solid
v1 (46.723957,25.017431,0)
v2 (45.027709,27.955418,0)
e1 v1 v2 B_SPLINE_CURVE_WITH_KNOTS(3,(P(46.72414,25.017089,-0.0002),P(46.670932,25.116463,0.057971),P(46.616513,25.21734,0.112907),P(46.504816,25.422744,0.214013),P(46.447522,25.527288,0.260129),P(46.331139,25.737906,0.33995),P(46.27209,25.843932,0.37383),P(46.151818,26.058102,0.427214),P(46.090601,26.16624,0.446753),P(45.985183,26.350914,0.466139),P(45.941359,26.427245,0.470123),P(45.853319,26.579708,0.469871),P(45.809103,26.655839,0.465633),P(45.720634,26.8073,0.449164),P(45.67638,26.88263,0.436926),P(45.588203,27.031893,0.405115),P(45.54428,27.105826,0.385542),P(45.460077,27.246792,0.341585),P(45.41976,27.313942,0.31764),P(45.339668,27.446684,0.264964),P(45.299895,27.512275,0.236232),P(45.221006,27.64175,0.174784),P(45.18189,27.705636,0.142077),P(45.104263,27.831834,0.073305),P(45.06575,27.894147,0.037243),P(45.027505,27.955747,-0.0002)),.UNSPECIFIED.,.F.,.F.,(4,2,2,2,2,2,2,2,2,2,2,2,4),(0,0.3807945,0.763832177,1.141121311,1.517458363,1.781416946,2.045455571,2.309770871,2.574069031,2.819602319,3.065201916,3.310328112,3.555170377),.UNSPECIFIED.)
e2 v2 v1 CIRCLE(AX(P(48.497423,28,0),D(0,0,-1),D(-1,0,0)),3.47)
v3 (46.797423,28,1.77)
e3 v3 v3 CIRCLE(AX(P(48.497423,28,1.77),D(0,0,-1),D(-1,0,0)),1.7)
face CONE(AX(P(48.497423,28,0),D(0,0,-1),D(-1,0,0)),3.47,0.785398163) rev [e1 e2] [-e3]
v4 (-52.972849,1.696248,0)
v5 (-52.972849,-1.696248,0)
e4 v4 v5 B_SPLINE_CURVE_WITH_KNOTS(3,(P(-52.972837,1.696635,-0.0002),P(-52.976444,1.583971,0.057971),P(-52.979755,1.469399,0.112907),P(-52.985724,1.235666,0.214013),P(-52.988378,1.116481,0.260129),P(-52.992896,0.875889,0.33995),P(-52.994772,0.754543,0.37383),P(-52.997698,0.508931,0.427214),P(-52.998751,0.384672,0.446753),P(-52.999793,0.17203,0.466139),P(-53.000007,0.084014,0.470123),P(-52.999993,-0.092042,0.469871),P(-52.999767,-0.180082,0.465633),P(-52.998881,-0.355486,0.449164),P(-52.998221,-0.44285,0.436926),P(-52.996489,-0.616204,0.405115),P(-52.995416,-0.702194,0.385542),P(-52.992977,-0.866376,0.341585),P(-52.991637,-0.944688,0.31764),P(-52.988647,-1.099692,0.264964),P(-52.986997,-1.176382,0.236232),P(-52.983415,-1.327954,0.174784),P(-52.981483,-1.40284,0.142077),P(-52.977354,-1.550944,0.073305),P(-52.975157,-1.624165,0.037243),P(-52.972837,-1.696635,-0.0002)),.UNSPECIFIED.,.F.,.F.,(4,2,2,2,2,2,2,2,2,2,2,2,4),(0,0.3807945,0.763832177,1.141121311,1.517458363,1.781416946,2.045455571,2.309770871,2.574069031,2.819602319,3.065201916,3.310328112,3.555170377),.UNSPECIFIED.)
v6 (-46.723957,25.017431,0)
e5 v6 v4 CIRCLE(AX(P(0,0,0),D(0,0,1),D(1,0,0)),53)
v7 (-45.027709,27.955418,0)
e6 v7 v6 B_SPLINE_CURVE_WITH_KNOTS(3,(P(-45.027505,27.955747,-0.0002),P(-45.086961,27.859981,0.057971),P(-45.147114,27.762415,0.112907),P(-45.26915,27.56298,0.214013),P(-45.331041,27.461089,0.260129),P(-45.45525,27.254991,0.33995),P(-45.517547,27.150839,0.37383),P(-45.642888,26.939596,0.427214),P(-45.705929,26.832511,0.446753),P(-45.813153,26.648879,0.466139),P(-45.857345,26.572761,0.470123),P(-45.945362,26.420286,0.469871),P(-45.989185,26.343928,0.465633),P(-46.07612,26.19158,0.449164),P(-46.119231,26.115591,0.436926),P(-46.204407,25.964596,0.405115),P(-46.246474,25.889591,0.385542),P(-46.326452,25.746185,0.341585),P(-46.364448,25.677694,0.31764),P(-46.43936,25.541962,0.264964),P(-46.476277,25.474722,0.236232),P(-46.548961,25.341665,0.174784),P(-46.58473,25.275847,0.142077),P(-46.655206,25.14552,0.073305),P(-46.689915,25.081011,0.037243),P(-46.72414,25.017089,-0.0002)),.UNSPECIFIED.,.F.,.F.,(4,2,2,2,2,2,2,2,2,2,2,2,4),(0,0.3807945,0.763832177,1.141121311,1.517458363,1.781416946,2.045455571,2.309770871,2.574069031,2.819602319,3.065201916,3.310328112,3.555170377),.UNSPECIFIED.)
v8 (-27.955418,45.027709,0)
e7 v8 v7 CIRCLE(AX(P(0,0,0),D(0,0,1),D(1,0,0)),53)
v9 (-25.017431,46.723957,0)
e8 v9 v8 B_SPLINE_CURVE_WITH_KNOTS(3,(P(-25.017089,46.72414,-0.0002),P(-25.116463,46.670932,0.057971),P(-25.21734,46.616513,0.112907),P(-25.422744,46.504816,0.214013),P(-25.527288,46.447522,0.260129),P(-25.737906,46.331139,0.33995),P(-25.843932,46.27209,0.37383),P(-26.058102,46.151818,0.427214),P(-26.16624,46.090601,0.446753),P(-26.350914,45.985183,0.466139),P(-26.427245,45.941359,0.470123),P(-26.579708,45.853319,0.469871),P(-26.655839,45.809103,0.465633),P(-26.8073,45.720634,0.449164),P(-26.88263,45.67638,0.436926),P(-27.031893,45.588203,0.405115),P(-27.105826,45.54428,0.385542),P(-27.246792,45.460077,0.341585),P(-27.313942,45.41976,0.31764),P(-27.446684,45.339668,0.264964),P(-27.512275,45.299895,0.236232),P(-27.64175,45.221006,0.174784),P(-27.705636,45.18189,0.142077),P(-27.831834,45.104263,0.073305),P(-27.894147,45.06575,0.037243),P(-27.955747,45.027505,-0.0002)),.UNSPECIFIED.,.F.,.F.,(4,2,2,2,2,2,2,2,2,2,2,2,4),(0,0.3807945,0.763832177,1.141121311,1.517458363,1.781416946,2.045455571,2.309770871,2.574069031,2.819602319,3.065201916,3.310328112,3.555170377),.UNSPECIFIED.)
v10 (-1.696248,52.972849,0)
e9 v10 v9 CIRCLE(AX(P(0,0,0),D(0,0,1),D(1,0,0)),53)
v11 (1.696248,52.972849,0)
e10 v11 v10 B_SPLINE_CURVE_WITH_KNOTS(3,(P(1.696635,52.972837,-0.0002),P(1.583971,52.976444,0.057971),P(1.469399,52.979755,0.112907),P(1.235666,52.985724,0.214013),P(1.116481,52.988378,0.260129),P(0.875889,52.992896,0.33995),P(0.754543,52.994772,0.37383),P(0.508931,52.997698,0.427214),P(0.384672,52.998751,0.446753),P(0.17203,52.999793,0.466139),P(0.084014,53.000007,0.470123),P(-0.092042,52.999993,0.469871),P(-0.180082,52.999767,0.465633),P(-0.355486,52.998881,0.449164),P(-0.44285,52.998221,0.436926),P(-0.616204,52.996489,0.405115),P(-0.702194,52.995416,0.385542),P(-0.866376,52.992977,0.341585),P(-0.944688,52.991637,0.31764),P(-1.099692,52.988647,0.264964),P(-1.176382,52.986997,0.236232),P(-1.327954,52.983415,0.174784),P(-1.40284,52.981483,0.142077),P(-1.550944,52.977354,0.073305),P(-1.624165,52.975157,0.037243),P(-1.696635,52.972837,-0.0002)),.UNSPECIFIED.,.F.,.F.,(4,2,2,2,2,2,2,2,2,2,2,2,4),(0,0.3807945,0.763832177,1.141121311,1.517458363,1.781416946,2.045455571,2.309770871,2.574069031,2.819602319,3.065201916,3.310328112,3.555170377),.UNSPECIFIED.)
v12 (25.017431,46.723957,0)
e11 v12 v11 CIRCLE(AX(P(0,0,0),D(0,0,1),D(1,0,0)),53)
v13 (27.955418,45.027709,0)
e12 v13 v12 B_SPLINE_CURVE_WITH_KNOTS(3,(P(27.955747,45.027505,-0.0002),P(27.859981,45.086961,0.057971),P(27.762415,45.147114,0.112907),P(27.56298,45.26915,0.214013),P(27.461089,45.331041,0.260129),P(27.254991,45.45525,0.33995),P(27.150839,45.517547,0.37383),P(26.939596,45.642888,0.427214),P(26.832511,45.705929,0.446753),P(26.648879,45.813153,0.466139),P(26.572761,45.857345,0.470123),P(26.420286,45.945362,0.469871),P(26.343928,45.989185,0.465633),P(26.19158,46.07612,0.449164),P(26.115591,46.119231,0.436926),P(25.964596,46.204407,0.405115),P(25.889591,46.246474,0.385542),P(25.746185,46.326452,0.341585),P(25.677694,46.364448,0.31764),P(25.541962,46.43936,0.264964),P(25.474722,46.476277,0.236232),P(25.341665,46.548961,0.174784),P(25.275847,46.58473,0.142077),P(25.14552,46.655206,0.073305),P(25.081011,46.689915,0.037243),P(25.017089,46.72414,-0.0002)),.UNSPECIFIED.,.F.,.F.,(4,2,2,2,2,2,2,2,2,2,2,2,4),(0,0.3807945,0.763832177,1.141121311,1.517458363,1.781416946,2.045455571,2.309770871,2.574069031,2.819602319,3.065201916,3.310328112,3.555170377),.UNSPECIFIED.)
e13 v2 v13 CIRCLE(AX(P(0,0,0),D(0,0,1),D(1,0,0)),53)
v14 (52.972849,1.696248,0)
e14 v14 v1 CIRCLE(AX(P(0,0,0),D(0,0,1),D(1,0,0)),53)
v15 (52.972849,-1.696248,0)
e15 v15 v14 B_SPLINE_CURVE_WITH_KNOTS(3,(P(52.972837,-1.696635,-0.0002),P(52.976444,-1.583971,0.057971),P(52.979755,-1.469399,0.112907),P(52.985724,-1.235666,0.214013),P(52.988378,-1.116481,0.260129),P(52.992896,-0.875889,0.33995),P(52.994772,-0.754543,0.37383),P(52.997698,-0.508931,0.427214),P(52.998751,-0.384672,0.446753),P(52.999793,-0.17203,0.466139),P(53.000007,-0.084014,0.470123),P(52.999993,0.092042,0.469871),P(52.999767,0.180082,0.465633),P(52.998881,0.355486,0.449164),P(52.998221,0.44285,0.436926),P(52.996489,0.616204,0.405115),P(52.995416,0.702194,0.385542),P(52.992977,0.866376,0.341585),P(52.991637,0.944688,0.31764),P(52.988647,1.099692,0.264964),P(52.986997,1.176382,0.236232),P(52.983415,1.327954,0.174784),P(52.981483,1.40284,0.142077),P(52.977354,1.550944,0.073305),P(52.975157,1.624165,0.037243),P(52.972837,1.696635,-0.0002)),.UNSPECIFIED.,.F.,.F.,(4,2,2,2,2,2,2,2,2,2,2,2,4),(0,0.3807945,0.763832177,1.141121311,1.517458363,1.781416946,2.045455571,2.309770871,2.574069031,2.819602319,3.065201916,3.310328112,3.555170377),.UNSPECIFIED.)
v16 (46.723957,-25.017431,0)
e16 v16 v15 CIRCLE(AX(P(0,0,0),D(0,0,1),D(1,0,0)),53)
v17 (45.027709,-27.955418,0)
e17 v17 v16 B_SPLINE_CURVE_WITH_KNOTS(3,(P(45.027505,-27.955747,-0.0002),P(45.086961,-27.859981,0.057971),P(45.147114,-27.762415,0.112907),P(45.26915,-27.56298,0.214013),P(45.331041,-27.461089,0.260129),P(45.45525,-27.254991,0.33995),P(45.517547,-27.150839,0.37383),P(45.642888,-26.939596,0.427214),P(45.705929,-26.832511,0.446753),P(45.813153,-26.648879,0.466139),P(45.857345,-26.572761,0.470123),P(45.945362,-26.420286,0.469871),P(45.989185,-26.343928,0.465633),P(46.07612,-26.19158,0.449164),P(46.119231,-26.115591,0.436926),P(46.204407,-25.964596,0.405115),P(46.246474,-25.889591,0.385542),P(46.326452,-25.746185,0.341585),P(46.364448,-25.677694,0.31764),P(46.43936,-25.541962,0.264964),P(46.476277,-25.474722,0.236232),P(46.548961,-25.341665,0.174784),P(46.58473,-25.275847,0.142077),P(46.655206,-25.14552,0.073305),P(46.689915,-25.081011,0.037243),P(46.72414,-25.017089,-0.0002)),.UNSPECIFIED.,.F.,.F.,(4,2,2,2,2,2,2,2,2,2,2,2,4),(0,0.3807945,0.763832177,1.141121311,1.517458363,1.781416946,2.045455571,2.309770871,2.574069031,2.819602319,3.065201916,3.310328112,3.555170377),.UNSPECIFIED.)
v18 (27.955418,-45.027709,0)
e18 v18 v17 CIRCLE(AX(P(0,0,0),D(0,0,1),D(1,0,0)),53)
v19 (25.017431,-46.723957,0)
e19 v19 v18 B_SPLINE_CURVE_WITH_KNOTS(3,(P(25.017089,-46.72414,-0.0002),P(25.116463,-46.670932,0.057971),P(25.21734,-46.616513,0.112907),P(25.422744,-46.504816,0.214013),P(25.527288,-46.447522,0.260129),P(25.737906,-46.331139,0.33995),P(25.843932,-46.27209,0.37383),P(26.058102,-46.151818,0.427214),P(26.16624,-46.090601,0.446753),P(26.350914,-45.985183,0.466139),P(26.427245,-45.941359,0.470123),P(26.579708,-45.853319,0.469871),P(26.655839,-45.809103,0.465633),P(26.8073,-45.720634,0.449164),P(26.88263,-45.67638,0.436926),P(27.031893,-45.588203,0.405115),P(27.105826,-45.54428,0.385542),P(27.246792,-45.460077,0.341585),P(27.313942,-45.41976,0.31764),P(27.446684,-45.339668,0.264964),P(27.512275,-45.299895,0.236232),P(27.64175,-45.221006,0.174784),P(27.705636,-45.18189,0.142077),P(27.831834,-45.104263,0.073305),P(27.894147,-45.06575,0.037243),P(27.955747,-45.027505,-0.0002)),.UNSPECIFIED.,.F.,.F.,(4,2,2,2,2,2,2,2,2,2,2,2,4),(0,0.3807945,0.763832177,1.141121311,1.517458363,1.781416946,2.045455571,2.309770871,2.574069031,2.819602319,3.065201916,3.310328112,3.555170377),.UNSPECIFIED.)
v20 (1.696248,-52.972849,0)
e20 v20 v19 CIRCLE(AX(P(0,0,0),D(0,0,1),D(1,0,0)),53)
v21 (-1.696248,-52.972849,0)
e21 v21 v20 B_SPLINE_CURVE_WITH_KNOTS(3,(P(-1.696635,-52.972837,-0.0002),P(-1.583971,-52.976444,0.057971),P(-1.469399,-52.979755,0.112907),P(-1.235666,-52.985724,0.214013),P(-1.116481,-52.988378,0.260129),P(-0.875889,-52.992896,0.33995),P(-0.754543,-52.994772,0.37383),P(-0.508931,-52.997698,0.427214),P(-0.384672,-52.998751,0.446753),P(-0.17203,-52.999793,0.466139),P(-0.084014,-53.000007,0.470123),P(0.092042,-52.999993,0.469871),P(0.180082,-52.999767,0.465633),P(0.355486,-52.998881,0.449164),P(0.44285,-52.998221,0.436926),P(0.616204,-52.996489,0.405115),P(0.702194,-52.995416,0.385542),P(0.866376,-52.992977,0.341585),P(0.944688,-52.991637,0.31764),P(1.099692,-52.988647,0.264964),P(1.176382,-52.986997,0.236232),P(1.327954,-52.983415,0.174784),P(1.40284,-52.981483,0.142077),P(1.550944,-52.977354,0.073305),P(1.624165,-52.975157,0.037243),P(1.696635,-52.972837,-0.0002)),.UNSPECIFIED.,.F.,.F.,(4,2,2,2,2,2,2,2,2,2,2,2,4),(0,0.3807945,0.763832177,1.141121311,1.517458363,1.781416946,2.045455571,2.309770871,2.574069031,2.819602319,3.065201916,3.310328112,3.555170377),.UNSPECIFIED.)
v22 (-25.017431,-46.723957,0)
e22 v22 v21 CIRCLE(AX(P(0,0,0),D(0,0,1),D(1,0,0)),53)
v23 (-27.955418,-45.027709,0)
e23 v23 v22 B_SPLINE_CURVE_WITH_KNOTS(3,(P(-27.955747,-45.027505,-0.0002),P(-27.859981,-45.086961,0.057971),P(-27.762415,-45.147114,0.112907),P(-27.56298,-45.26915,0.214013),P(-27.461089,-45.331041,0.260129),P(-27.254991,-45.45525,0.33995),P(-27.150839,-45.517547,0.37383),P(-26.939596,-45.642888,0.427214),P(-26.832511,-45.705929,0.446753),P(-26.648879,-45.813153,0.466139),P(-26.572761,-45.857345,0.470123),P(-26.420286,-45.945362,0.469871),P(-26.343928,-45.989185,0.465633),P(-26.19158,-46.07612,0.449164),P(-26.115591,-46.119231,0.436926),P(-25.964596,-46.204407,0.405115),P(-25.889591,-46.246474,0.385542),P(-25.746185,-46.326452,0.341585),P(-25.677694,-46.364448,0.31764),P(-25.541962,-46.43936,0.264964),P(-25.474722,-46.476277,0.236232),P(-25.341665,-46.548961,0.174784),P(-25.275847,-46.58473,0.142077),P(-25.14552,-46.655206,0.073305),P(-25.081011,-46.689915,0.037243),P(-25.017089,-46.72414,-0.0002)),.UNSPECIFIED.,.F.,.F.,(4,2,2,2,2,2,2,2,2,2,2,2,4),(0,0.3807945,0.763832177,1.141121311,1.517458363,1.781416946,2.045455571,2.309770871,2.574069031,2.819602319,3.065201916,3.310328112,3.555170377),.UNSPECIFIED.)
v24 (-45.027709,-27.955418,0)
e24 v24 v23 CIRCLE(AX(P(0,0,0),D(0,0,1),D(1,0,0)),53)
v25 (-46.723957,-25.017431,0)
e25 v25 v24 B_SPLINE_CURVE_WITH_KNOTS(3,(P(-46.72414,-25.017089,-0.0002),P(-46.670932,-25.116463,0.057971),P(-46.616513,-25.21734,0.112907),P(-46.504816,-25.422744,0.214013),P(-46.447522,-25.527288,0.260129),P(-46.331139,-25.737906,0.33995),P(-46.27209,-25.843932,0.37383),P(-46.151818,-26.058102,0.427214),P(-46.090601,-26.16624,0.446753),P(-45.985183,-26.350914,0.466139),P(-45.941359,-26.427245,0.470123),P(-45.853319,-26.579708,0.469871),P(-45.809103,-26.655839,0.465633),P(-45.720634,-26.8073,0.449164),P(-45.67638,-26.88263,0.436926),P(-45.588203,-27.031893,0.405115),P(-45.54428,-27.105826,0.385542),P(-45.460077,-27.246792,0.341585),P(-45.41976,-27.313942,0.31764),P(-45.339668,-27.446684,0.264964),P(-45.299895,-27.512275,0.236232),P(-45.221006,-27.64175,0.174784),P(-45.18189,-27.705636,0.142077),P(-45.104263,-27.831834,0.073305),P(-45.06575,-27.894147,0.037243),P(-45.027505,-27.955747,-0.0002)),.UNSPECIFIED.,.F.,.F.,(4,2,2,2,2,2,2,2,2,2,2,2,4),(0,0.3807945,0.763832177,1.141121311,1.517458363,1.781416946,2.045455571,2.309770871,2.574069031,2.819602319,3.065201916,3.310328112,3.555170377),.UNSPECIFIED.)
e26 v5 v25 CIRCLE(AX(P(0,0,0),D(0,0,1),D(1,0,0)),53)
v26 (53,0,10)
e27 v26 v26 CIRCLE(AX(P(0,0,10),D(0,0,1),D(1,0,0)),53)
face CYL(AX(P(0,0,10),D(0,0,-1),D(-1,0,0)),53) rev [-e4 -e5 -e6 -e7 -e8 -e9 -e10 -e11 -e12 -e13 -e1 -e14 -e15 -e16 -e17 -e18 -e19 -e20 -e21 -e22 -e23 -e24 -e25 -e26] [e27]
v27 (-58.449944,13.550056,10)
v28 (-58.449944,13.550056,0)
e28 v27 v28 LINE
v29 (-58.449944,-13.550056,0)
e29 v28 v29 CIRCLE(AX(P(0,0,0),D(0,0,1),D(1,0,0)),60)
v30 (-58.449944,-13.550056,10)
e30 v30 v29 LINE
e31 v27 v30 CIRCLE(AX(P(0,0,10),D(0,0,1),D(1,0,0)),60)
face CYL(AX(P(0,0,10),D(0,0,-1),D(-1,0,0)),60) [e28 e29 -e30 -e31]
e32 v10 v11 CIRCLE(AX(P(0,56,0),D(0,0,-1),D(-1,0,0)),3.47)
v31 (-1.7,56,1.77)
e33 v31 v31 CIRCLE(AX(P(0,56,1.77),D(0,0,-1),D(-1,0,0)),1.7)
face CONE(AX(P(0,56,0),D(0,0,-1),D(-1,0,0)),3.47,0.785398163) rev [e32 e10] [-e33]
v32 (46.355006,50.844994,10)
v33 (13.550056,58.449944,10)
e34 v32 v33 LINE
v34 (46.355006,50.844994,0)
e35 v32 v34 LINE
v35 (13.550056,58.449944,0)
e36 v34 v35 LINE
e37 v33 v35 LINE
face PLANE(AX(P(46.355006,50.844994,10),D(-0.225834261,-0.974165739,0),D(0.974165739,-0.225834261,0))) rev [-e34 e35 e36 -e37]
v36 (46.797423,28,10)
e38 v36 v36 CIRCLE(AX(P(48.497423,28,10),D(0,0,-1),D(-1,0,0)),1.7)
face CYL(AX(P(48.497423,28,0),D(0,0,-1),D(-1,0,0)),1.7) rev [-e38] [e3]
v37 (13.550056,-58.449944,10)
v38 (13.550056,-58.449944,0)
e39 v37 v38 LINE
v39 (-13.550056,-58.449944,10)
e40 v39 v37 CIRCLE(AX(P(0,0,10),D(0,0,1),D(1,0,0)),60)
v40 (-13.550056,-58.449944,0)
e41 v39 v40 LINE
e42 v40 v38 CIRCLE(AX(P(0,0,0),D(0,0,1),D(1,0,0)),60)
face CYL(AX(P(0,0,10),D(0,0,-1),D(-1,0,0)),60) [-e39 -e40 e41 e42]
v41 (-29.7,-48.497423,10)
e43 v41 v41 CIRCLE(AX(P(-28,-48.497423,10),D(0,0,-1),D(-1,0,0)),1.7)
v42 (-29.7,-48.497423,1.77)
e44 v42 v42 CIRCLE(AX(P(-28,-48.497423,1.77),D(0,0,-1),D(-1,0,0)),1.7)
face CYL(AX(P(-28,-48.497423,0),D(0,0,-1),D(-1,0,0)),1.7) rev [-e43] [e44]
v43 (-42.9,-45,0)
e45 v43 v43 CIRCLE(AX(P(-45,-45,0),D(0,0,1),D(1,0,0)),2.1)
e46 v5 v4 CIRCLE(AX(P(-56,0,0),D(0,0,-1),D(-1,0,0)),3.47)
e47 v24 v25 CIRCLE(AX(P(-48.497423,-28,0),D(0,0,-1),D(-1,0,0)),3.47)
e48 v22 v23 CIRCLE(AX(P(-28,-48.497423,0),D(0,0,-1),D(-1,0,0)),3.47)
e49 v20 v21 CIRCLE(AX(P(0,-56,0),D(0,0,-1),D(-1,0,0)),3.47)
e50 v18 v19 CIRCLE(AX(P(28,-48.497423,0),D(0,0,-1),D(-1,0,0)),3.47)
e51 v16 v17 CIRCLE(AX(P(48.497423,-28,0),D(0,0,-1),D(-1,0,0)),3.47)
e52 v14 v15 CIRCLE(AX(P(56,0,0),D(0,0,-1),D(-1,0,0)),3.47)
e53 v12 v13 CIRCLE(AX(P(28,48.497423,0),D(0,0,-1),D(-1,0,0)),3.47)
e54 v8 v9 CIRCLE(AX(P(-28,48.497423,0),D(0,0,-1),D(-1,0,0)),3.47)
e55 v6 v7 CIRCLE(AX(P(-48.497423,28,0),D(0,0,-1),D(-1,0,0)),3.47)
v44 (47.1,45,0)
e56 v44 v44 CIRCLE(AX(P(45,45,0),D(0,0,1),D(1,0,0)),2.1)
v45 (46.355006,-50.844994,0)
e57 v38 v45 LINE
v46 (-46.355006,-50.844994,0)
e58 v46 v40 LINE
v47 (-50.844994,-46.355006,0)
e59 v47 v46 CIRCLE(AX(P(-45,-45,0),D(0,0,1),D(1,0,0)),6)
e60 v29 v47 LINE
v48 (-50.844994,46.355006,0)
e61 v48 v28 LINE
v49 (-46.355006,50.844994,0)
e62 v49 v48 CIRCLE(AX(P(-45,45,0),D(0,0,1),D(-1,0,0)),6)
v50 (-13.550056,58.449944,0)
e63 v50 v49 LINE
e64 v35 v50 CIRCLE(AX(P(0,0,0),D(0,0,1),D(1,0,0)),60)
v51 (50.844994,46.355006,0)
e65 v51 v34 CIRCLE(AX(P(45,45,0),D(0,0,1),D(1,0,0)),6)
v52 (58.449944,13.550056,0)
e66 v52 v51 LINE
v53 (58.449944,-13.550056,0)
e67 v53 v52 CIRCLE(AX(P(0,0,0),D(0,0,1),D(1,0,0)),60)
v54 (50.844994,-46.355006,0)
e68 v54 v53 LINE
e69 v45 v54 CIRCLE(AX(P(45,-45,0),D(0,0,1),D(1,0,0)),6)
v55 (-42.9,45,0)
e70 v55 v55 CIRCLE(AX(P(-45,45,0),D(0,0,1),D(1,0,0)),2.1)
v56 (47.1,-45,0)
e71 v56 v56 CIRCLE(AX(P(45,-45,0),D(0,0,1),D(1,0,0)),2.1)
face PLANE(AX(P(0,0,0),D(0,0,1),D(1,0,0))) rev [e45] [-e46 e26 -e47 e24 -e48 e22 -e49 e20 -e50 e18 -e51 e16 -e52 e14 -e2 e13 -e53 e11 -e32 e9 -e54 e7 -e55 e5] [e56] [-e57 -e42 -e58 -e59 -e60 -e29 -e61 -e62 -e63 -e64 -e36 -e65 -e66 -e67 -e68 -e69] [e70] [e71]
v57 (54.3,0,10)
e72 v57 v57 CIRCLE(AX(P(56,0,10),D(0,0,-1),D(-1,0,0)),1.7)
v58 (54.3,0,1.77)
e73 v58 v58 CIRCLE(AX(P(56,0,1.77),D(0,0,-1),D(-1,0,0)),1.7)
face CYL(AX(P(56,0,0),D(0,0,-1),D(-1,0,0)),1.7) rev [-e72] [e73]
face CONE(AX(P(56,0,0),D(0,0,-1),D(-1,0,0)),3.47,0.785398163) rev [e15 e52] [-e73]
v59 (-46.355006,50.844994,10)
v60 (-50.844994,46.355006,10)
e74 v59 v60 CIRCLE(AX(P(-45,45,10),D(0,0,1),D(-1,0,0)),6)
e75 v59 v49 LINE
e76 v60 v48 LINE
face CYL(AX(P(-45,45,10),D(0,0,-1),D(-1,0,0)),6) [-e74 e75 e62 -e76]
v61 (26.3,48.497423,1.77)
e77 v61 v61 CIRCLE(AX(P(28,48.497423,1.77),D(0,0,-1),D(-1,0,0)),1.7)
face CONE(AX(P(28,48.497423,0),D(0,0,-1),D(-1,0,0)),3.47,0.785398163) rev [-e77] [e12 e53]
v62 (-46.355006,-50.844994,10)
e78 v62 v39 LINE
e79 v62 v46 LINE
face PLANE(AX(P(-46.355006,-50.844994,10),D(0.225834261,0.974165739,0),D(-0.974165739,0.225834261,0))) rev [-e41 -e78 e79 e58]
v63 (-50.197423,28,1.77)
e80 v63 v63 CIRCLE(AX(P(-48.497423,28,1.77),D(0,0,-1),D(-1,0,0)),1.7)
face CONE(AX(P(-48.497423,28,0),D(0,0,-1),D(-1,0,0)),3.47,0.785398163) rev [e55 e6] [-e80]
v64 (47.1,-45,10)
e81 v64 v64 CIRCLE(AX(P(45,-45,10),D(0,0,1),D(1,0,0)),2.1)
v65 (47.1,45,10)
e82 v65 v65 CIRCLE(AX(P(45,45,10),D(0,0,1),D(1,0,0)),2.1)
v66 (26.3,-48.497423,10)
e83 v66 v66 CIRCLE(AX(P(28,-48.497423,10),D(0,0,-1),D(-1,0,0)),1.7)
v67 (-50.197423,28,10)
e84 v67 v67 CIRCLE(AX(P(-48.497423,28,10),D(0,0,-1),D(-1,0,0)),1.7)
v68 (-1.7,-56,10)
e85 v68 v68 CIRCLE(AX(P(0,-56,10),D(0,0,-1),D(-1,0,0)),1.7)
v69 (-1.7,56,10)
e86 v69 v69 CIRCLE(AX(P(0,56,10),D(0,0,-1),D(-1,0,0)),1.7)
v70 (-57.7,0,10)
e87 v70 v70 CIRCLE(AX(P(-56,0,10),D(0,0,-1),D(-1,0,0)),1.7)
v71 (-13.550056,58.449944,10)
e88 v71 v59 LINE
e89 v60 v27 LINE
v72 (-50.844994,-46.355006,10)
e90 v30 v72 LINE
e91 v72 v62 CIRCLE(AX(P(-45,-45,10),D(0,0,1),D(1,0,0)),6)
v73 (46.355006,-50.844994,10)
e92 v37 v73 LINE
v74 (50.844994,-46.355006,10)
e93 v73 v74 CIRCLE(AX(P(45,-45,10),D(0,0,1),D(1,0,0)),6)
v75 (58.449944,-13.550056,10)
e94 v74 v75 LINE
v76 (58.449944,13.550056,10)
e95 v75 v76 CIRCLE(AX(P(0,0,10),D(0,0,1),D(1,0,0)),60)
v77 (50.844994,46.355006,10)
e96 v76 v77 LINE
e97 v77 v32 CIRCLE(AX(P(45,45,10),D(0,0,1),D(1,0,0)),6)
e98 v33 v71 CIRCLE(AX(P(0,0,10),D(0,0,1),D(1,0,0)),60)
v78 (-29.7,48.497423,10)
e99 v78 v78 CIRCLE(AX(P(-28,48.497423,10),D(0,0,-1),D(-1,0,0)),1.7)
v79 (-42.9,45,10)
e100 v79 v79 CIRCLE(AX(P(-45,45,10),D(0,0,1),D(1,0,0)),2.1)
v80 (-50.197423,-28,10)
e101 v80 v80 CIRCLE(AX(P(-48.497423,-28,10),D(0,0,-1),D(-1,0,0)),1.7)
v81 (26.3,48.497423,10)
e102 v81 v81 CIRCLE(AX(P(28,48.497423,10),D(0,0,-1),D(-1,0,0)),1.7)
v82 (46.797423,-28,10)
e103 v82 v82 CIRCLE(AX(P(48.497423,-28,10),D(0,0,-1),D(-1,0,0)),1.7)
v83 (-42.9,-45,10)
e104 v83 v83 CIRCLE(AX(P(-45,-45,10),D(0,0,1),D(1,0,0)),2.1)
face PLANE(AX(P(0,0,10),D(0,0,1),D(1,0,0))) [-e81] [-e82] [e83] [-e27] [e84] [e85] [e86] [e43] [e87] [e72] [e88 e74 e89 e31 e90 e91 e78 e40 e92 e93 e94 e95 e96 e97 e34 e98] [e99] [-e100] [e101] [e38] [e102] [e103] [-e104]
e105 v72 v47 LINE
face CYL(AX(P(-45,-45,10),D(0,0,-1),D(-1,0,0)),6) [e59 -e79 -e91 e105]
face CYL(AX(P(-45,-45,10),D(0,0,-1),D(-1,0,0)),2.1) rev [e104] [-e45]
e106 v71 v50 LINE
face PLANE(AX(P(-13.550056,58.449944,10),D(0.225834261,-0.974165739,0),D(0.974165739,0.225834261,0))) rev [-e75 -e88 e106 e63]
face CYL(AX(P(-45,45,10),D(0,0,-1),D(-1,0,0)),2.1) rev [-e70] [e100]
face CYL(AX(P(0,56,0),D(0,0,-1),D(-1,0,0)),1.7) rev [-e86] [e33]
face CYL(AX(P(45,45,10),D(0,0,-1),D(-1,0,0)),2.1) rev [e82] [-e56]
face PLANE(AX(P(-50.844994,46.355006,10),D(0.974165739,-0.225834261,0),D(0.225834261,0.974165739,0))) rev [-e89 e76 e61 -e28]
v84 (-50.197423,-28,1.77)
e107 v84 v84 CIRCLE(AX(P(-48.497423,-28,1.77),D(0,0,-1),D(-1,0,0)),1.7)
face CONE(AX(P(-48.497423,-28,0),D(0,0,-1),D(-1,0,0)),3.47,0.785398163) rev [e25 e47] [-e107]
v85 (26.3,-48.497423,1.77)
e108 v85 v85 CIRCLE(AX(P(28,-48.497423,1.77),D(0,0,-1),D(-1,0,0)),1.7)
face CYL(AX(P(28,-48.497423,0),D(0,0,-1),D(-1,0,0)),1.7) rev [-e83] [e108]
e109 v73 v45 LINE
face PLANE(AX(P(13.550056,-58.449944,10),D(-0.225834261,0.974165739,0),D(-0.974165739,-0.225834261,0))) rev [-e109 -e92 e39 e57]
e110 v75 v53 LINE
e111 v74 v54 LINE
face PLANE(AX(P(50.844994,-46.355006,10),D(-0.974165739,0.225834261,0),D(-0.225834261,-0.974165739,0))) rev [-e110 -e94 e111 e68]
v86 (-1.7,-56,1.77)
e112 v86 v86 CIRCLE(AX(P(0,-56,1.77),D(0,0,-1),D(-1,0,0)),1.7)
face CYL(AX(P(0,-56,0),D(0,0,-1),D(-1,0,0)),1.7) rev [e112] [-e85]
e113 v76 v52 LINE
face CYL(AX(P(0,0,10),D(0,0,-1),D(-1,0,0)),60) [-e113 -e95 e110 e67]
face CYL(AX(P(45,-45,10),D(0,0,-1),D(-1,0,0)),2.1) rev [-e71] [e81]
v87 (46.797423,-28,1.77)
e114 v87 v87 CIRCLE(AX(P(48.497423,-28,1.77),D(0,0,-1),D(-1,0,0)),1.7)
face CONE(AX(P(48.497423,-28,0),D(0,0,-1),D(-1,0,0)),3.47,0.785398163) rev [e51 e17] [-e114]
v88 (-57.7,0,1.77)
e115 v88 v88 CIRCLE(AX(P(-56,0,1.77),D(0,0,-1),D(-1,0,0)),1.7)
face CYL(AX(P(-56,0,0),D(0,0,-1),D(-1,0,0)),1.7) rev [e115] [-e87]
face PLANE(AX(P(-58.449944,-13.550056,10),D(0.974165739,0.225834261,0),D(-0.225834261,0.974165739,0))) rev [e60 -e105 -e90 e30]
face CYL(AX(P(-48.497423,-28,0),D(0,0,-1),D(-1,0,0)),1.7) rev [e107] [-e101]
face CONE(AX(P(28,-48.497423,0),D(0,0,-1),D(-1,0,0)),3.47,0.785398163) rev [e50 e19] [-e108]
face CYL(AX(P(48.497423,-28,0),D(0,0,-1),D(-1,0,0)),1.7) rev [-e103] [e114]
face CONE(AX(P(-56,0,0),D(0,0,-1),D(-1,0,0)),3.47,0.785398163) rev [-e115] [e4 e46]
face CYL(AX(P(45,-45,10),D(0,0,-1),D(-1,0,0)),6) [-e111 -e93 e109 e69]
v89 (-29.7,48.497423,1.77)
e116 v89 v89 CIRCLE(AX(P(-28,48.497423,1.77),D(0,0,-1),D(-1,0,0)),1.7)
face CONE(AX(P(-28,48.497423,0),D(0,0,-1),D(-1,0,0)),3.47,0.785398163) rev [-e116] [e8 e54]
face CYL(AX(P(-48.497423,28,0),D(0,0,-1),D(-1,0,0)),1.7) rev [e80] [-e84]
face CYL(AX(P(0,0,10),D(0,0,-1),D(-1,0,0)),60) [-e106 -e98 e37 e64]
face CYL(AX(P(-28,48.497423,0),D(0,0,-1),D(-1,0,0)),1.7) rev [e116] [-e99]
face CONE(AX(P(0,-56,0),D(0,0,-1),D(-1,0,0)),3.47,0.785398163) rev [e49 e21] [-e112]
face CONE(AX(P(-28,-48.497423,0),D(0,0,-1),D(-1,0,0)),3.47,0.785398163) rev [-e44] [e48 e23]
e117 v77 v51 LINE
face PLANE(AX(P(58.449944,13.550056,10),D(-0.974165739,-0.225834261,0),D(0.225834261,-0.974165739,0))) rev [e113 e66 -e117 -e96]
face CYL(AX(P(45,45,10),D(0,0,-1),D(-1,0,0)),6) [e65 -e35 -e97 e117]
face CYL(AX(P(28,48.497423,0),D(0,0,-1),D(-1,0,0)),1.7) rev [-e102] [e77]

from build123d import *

# Parameters (mm, degrees)
SKETCH_1_R                     = 2.1
SKETCH_1_R_2                   = 1.6
SKETCH_1_R_3                   = 53
EXTRUDE_1_DEPTH                = 10
HOLE_WIZARD_M3_2_D             = 3.4
HOLE_WIZARD_M3_2_CSINK_D       = 6.94
HOLE_WIZARD_M3_2_CSINK_ANGLE   = 90
PATTERN_CIRCULAR_1_OUTLINE_R   = 1.7
PATTERN_CIRCULAR_1_OUTLINE_R_2 = 1.6
PATTERN_CIRCULAR_1_DEPTH       = 11


with BuildPart() as part:
    # 草图1 → 凸台-拉伸1 (new body)
    with BuildSketch(Plane.XY):
        with BuildLine():
            Line((-50.844994432, 46.355005568), (-58.449944321, 13.550055679))
            ThreePointArc((-58.449944321, 13.550055679), (-60, 0), (-58.449944321, -13.550055679))
            Line((-58.449944321, -13.550055679), (-50.844994432, -46.355005568))
            ThreePointArc((-50.844994432, -46.355005568), (-49.242640687, -49.242640687), (-46.355005568, -50.844994432))
            Line((-46.355005568, -50.844994432), (-13.550055679, -58.449944321))
            ThreePointArc((-13.550055679, -58.449944321), (0, -60), (13.550055679, -58.449944321))
            Line((13.550055679, -58.449944321), (46.355005568, -50.844994432))
            ThreePointArc((46.355005568, -50.844994432), (49.242640687, -49.242640687), (50.844994432, -46.355005568))
            Line((50.844994432, -46.355005568), (58.449944321, -13.550055679))
            ThreePointArc((58.449944321, -13.550055679), (60, 0), (58.449944321, 13.550055679))
            Line((58.449944321, 13.550055679), (50.844994432, 46.355005568))
            ThreePointArc((50.844994432, 46.355005568), (49.242640687, 49.242640687), (46.355005568, 50.844994432))
            Line((46.355005568, 50.844994432), (13.550055679, 58.449944321))
            ThreePointArc((13.550055679, 58.449944321), (0, 60), (-13.550055679, 58.449944321))
            Line((-13.550055679, 58.449944321), (-46.355005568, 50.844994432))
            ThreePointArc((-46.355005568, 50.844994432), (-49.242640687, 49.242640687), (-50.844994432, 46.355005568))
        make_face()
        with Locations((45, 45)):
            Circle(SKETCH_1_R, mode=Mode.SUBTRACT)
        with Locations((-45, 45)):
            Circle(SKETCH_1_R, mode=Mode.SUBTRACT)
        with Locations((-45, -45)):
            Circle(SKETCH_1_R, mode=Mode.SUBTRACT)
        with Locations((45, -45)):
            Circle(SKETCH_1_R, mode=Mode.SUBTRACT)
        with Locations((0, 56)):
            Circle(SKETCH_1_R_2, mode=Mode.SUBTRACT)
        with Locations((28, 48.497422612)):
            Circle(SKETCH_1_R_2, mode=Mode.SUBTRACT)
        with Locations((48.497422612, 28)):
            Circle(SKETCH_1_R_2, mode=Mode.SUBTRACT)
        with Locations((56, 0)):
            Circle(SKETCH_1_R_2, mode=Mode.SUBTRACT)
        with Locations((48.497422612, -28)):
            Circle(SKETCH_1_R_2, mode=Mode.SUBTRACT)
        with Locations((28, -48.497422612)):
            Circle(SKETCH_1_R_2, mode=Mode.SUBTRACT)
        with Locations((0, -56)):
            Circle(SKETCH_1_R_2, mode=Mode.SUBTRACT)
        with Locations((-28, -48.497422612)):
            Circle(SKETCH_1_R_2, mode=Mode.SUBTRACT)
        with Locations((-48.497422612, -28)):
            Circle(SKETCH_1_R_2, mode=Mode.SUBTRACT)
        with Locations((-56, 0)):
            Circle(SKETCH_1_R_2, mode=Mode.SUBTRACT)
        with Locations((-48.497422612, 28)):
            Circle(SKETCH_1_R_2, mode=Mode.SUBTRACT)
        with Locations((-28, 48.497422612)):
            Circle(SKETCH_1_R_2, mode=Mode.SUBTRACT)
        Circle(SKETCH_1_R_3, mode=Mode.SUBTRACT)
    extrude(amount=EXTRUDE_1_DEPTH)

    # M3 六角凹锥坑头螺钉的锥形沉头孔2 (through all)
    with Locations(Plane(origin=(0, 0, 0), x_dir=(-1, 0, 0), z_dir=(0, 0, -1))):
        with Locations((0, 56)):
            CounterSinkHole(HOLE_WIZARD_M3_2_D / 2, HOLE_WIZARD_M3_2_CSINK_D / 2, counter_sink_angle=HOLE_WIZARD_M3_2_CSINK_ANGLE)

    # 阵列(圆周)1: read off the stored shape, not the designer's step
    # 阵列(圆周)1 outline → 阵列(圆周)1 (cut)
    # profile 1 of 11: a face of its own
    with BuildSketch(Plane.XY):
        with Locations((28, 48.497422612)):
            Circle(PATTERN_CIRCULAR_1_OUTLINE_R)
        with Locations((28, 48.497422612)):
            Circle(PATTERN_CIRCULAR_1_OUTLINE_R_2, mode=Mode.SUBTRACT)
    # profile 2 of 11: a face of its own
    with BuildSketch(Plane.XY):
        with Locations((48.497422612, 28)):
            Circle(PATTERN_CIRCULAR_1_OUTLINE_R)
        with Locations((48.497422612, 28)):
            Circle(PATTERN_CIRCULAR_1_OUTLINE_R_2, mode=Mode.SUBTRACT)
    # profile 3 of 11: a face of its own
    with BuildSketch(Plane.XY):
        with Locations((56, 0)):
            Circle(PATTERN_CIRCULAR_1_OUTLINE_R)
        with Locations((56, 0)):
            Circle(PATTERN_CIRCULAR_1_OUTLINE_R_2, mode=Mode.SUBTRACT)
    # profile 4 of 11: a face of its own
    with BuildSketch(Plane.XY):
        with Locations((48.497422612, -28)):
            Circle(PATTERN_CIRCULAR_1_OUTLINE_R)
        with Locations((48.497422612, -28)):
            Circle(PATTERN_CIRCULAR_1_OUTLINE_R_2, mode=Mode.SUBTRACT)
    # profile 5 of 11: a face of its own
    with BuildSketch(Plane.XY):
        with Locations((28, -48.497422612)):
            Circle(PATTERN_CIRCULAR_1_OUTLINE_R)
        with Locations((28, -48.497422612)):
            Circle(PATTERN_CIRCULAR_1_OUTLINE_R_2, mode=Mode.SUBTRACT)
    # profile 6 of 11: a face of its own
    with BuildSketch(Plane.XY):
        with Locations((0, -56)):
            Circle(PATTERN_CIRCULAR_1_OUTLINE_R)
        with Locations((0, -56)):
            Circle(PATTERN_CIRCULAR_1_OUTLINE_R_2, mode=Mode.SUBTRACT)
    # profile 7 of 11: a face of its own
    with BuildSketch(Plane.XY):
        with Locations((-28, -48.497422612)):
            Circle(PATTERN_CIRCULAR_1_OUTLINE_R)
        with Locations((-28, -48.497422612)):
            Circle(PATTERN_CIRCULAR_1_OUTLINE_R_2, mode=Mode.SUBTRACT)
    # profile 8 of 11: a face of its own
    with BuildSketch(Plane.XY):
        with Locations((-48.497422612, -28)):
            Circle(PATTERN_CIRCULAR_1_OUTLINE_R)
        with Locations((-48.497422612, -28)):
            Circle(PATTERN_CIRCULAR_1_OUTLINE_R_2, mode=Mode.SUBTRACT)
    # profile 9 of 11: a face of its own
    with BuildSketch(Plane.XY):
        with Locations((-56, 0)):
            Circle(PATTERN_CIRCULAR_1_OUTLINE_R)
        with Locations((-56, 0)):
            Circle(PATTERN_CIRCULAR_1_OUTLINE_R_2, mode=Mode.SUBTRACT)
    # profile 10 of 11: a face of its own
    with BuildSketch(Plane.XY):
        with Locations((-48.497422612, 28)):
            Circle(PATTERN_CIRCULAR_1_OUTLINE_R)
        with Locations((-48.497422612, 28)):
            Circle(PATTERN_CIRCULAR_1_OUTLINE_R_2, mode=Mode.SUBTRACT)
    # profile 11 of 11: a face of its own
    with BuildSketch(Plane.XY):
        with Locations((-28, 48.497422612)):
            Circle(PATTERN_CIRCULAR_1_OUTLINE_R)
        with Locations((-28, 48.497422612)):
            Circle(PATTERN_CIRCULAR_1_OUTLINE_R_2, mode=Mode.SUBTRACT)
    extrude(amount=PATTERN_CIRCULAR_1_DEPTH, mode=Mode.SUBTRACT)

    # Pattern Circular 1 2: loft between two sections, ruled curve by curve
    pattern_circular_1_2_from = [
        Edge.make_three_point_arc((26.3, 48.497422612, 1.77), (28, 50.197422612, 1.77), (29.7, 48.497422612, 1.77)),
        Edge.make_three_point_arc((29.7, 48.497422612, 1.77), (28, 46.797422612, 1.77), (26.3, 48.497422612, 1.77)),
    ]
    pattern_circular_1_2_to = [
        Edge.make_three_point_arc((24.529999939, 48.497422612, -6.1e-08), (28, 51.967422673, -6.1e-08), (31.470000061, 48.497422612, -6.1e-08)),
        Edge.make_three_point_arc((31.470000061, 48.497422612, -6.1e-08), (28, 45.027422551, -6.1e-08), (24.529999939, 48.497422612, -6.1e-08)),
    ]
    pattern_circular_1_2 = Solid(Shell([*[Face.make_surface_from_curves(pattern_circular_1_2_from[k], pattern_circular_1_2_to[k]) for k in range(2)], Face(Wire(pattern_circular_1_2_from)), Face(Wire(pattern_circular_1_2_to))]))
    add(pattern_circular_1_2, mode=Mode.SUBTRACT)

    # Pattern Circular 1 3: loft between two sections, ruled curve by curve
    pattern_circular_1_3_from = [
        Edge.make_three_point_arc((46.797422612, 28, 1.77), (48.497422612, 29.7, 1.77), (50.197422612, 28, 1.77)),
        Edge.make_three_point_arc((50.197422612, 28, 1.77), (48.497422612, 26.3, 1.77), (46.797422612, 28, 1.77)),
    ]
    pattern_circular_1_3_to = [
        Edge.make_three_point_arc((45.027422551, 28, -6.1e-08), (48.497422612, 31.470000061, -6.1e-08), (51.967422673, 28, -6.1e-08)),
        Edge.make_three_point_arc((51.967422673, 28, -6.1e-08), (48.497422612, 24.529999939, -6.1e-08), (45.027422551, 28, -6.1e-08)),
    ]
    pattern_circular_1_3 = Solid(Shell([*[Face.make_surface_from_curves(pattern_circular_1_3_from[k], pattern_circular_1_3_to[k]) for k in range(2)], Face(Wire(pattern_circular_1_3_from)), Face(Wire(pattern_circular_1_3_to))]))
    add(pattern_circular_1_3, mode=Mode.SUBTRACT)

    # Pattern Circular 1 4: loft between two sections, ruled curve by curve
    pattern_circular_1_4_from = [
        Edge.make_three_point_arc((54.3, 0, 1.77), (56, 1.7, 1.77), (57.7, 0, 1.77)),
        Edge.make_three_point_arc((57.7, 0, 1.77), (56, -1.7, 1.77), (54.3, 0, 1.77)),
    ]
    pattern_circular_1_4_to = [
        Edge.make_three_point_arc((52.529999939, 0, -6.1e-08), (56, 3.470000061, -6.1e-08), (59.470000061, 0, -6.1e-08)),
        Edge.make_three_point_arc((59.470000061, 0, -6.1e-08), (56, -3.470000061, -6.1e-08), (52.529999939, 0, -6.1e-08)),
    ]
    pattern_circular_1_4 = Solid(Shell([*[Face.make_surface_from_curves(pattern_circular_1_4_from[k], pattern_circular_1_4_to[k]) for k in range(2)], Face(Wire(pattern_circular_1_4_from)), Face(Wire(pattern_circular_1_4_to))]))
    add(pattern_circular_1_4, mode=Mode.SUBTRACT)

    # Pattern Circular 1 5: loft between two sections, ruled curve by curve
    pattern_circular_1_5_from = [
        Edge.make_three_point_arc((46.797422612, -28, 1.77), (48.497422612, -26.3, 1.77), (50.197422612, -28, 1.77)),
        Edge.make_three_point_arc((50.197422612, -28, 1.77), (48.497422612, -29.7, 1.77), (46.797422612, -28, 1.77)),
    ]
    pattern_circular_1_5_to = [
        Edge.make_three_point_arc((45.027422551, -28, -6.1e-08), (48.497422612, -24.529999939, -6.1e-08), (51.967422673, -28, -6.1e-08)),
        Edge.make_three_point_arc((51.967422673, -28, -6.1e-08), (48.497422612, -31.470000061, -6.1e-08), (45.027422551, -28, -6.1e-08)),
    ]
    pattern_circular_1_5 = Solid(Shell([*[Face.make_surface_from_curves(pattern_circular_1_5_from[k], pattern_circular_1_5_to[k]) for k in range(2)], Face(Wire(pattern_circular_1_5_from)), Face(Wire(pattern_circular_1_5_to))]))
    add(pattern_circular_1_5, mode=Mode.SUBTRACT)

    # Pattern Circular 1 6: loft between two sections, ruled curve by curve
    pattern_circular_1_6_from = [
        Edge.make_three_point_arc((26.3, -48.497422612, 1.77), (28, -46.797422612, 1.77), (29.7, -48.497422612, 1.77)),
        Edge.make_three_point_arc((29.7, -48.497422612, 1.77), (28, -50.197422612, 1.77), (26.3, -48.497422612, 1.77)),
    ]
    pattern_circular_1_6_to = [
        Edge.make_three_point_arc((24.529999939, -48.497422612, -6.1e-08), (28, -45.027422551, -6.1e-08), (31.470000061, -48.497422612, -6.1e-08)),
        Edge.make_three_point_arc((31.470000061, -48.497422612, -6.1e-08), (28, -51.967422673, -6.1e-08), (24.529999939, -48.497422612, -6.1e-08)),
    ]
    pattern_circular_1_6 = Solid(Shell([*[Face.make_surface_from_curves(pattern_circular_1_6_from[k], pattern_circular_1_6_to[k]) for k in range(2)], Face(Wire(pattern_circular_1_6_from)), Face(Wire(pattern_circular_1_6_to))]))
    add(pattern_circular_1_6, mode=Mode.SUBTRACT)

    # Pattern Circular 1 7: loft between two sections, ruled curve by curve
    pattern_circular_1_7_from = [
        Edge.make_three_point_arc((-1.7, -56, 1.77), (0, -54.3, 1.77), (1.7, -56, 1.77)),
        Edge.make_three_point_arc((1.7, -56, 1.77), (0, -57.7, 1.77), (-1.7, -56, 1.77)),
    ]
    pattern_circular_1_7_to = [
        Edge.make_three_point_arc((-3.470000061, -56, -6.1e-08), (0, -52.529999939, -6.1e-08), (3.470000061, -56, -6.1e-08)),
        Edge.make_three_point_arc((3.470000061, -56, -6.1e-08), (0, -59.470000061, -6.1e-08), (-3.470000061, -56, -6.1e-08)),
    ]
    pattern_circular_1_7 = Solid(Shell([*[Face.make_surface_from_curves(pattern_circular_1_7_from[k], pattern_circular_1_7_to[k]) for k in range(2)], Face(Wire(pattern_circular_1_7_from)), Face(Wire(pattern_circular_1_7_to))]))
    add(pattern_circular_1_7, mode=Mode.SUBTRACT)

    # Pattern Circular 1 8: loft between two sections, ruled curve by curve
    pattern_circular_1_8_from = [
        Edge.make_three_point_arc((-29.7, -48.497422612, 1.77), (-28, -46.797422612, 1.77), (-26.3, -48.497422612, 1.77)),
        Edge.make_three_point_arc((-26.3, -48.497422612, 1.77), (-28, -50.197422612, 1.77), (-29.7, -48.497422612, 1.77)),
    ]
    pattern_circular_1_8_to = [
        Edge.make_three_point_arc((-31.470000061, -48.497422612, -6.1e-08), (-28, -45.027422551, -6.1e-08), (-24.529999939, -48.497422612, -6.1e-08)),
        Edge.make_three_point_arc((-24.529999939, -48.497422612, -6.1e-08), (-28, -51.967422673, -6.1e-08), (-31.470000061, -48.497422612, -6.1e-08)),
    ]
    pattern_circular_1_8 = Solid(Shell([*[Face.make_surface_from_curves(pattern_circular_1_8_from[k], pattern_circular_1_8_to[k]) for k in range(2)], Face(Wire(pattern_circular_1_8_from)), Face(Wire(pattern_circular_1_8_to))]))
    add(pattern_circular_1_8, mode=Mode.SUBTRACT)

    # Pattern Circular 1 9: loft between two sections, ruled curve by curve
    pattern_circular_1_9_from = [
        Edge.make_three_point_arc((-50.197422612, -28, 1.77), (-48.497422612, -26.3, 1.77), (-46.797422612, -28, 1.77)),
        Edge.make_three_point_arc((-46.797422612, -28, 1.77), (-48.497422612, -29.7, 1.77), (-50.197422612, -28, 1.77)),
    ]
    pattern_circular_1_9_to = [
        Edge.make_three_point_arc((-51.967422673, -28, -6.1e-08), (-48.497422612, -24.529999939, -6.1e-08), (-45.027422551, -28, -6.1e-08)),
        Edge.make_three_point_arc((-45.027422551, -28, -6.1e-08), (-48.497422612, -31.470000061, -6.1e-08), (-51.967422673, -28, -6.1e-08)),
    ]
    pattern_circular_1_9 = Solid(Shell([*[Face.make_surface_from_curves(pattern_circular_1_9_from[k], pattern_circular_1_9_to[k]) for k in range(2)], Face(Wire(pattern_circular_1_9_from)), Face(Wire(pattern_circular_1_9_to))]))
    add(pattern_circular_1_9, mode=Mode.SUBTRACT)

    # Pattern Circular 1 10: loft between two sections, ruled curve by curve
    pattern_circular_1_10_from = [
        Edge.make_three_point_arc((-57.7, 0, 1.77), (-56, 1.7, 1.77), (-54.3, 0, 1.77)),
        Edge.make_three_point_arc((-54.3, 0, 1.77), (-56, -1.7, 1.77), (-57.7, 0, 1.77)),
    ]
    pattern_circular_1_10_to = [
        Edge.make_three_point_arc((-59.470000061, 0, -6.1e-08), (-56, 3.470000061, -6.1e-08), (-52.529999939, 0, -6.1e-08)),
        Edge.make_three_point_arc((-52.529999939, 0, -6.1e-08), (-56, -3.470000061, -6.1e-08), (-59.470000061, 0, -6.1e-08)),
    ]
    pattern_circular_1_10 = Solid(Shell([*[Face.make_surface_from_curves(pattern_circular_1_10_from[k], pattern_circular_1_10_to[k]) for k in range(2)], Face(Wire(pattern_circular_1_10_from)), Face(Wire(pattern_circular_1_10_to))]))
    add(pattern_circular_1_10, mode=Mode.SUBTRACT)

    # Pattern Circular 1 11: loft between two sections, ruled curve by curve
    pattern_circular_1_11_from = [
        Edge.make_three_point_arc((-50.197422612, 28, 1.77), (-48.497422612, 29.7, 1.77), (-46.797422612, 28, 1.77)),
        Edge.make_three_point_arc((-46.797422612, 28, 1.77), (-48.497422612, 26.3, 1.77), (-50.197422612, 28, 1.77)),
    ]
    pattern_circular_1_11_to = [
        Edge.make_three_point_arc((-51.967422673, 28, -6.1e-08), (-48.497422612, 31.470000061, -6.1e-08), (-45.027422551, 28, -6.1e-08)),
        Edge.make_three_point_arc((-45.027422551, 28, -6.1e-08), (-48.497422612, 24.529999939, -6.1e-08), (-51.967422673, 28, -6.1e-08)),
    ]
    pattern_circular_1_11 = Solid(Shell([*[Face.make_surface_from_curves(pattern_circular_1_11_from[k], pattern_circular_1_11_to[k]) for k in range(2)], Face(Wire(pattern_circular_1_11_from)), Face(Wire(pattern_circular_1_11_to))]))
    add(pattern_circular_1_11, mode=Mode.SUBTRACT)

    # Pattern Circular 1 12: loft between two sections, ruled curve by curve
    pattern_circular_1_12_from = [
        Edge.make_three_point_arc((-29.7, 48.497422612, 1.77), (-28, 50.197422612, 1.77), (-26.3, 48.497422612, 1.77)),
        Edge.make_three_point_arc((-26.3, 48.497422612, 1.77), (-28, 46.797422612, 1.77), (-29.7, 48.497422612, 1.77)),
    ]
    pattern_circular_1_12_to = [
        Edge.make_three_point_arc((-31.470000061, 48.497422612, -6.1e-08), (-28, 51.967422673, -6.1e-08), (-24.529999939, 48.497422612, -6.1e-08)),
        Edge.make_three_point_arc((-24.529999939, 48.497422612, -6.1e-08), (-28, 45.027422551, -6.1e-08), (-31.470000061, 48.497422612, -6.1e-08)),
    ]
    pattern_circular_1_12 = Solid(Shell([*[Face.make_surface_from_curves(pattern_circular_1_12_from[k], pattern_circular_1_12_to[k]) for k in range(2)], Face(Wire(pattern_circular_1_12_from)), Face(Wire(pattern_circular_1_12_to))]))
    add(pattern_circular_1_12, mode=Mode.SUBTRACT)


solid = part.part
